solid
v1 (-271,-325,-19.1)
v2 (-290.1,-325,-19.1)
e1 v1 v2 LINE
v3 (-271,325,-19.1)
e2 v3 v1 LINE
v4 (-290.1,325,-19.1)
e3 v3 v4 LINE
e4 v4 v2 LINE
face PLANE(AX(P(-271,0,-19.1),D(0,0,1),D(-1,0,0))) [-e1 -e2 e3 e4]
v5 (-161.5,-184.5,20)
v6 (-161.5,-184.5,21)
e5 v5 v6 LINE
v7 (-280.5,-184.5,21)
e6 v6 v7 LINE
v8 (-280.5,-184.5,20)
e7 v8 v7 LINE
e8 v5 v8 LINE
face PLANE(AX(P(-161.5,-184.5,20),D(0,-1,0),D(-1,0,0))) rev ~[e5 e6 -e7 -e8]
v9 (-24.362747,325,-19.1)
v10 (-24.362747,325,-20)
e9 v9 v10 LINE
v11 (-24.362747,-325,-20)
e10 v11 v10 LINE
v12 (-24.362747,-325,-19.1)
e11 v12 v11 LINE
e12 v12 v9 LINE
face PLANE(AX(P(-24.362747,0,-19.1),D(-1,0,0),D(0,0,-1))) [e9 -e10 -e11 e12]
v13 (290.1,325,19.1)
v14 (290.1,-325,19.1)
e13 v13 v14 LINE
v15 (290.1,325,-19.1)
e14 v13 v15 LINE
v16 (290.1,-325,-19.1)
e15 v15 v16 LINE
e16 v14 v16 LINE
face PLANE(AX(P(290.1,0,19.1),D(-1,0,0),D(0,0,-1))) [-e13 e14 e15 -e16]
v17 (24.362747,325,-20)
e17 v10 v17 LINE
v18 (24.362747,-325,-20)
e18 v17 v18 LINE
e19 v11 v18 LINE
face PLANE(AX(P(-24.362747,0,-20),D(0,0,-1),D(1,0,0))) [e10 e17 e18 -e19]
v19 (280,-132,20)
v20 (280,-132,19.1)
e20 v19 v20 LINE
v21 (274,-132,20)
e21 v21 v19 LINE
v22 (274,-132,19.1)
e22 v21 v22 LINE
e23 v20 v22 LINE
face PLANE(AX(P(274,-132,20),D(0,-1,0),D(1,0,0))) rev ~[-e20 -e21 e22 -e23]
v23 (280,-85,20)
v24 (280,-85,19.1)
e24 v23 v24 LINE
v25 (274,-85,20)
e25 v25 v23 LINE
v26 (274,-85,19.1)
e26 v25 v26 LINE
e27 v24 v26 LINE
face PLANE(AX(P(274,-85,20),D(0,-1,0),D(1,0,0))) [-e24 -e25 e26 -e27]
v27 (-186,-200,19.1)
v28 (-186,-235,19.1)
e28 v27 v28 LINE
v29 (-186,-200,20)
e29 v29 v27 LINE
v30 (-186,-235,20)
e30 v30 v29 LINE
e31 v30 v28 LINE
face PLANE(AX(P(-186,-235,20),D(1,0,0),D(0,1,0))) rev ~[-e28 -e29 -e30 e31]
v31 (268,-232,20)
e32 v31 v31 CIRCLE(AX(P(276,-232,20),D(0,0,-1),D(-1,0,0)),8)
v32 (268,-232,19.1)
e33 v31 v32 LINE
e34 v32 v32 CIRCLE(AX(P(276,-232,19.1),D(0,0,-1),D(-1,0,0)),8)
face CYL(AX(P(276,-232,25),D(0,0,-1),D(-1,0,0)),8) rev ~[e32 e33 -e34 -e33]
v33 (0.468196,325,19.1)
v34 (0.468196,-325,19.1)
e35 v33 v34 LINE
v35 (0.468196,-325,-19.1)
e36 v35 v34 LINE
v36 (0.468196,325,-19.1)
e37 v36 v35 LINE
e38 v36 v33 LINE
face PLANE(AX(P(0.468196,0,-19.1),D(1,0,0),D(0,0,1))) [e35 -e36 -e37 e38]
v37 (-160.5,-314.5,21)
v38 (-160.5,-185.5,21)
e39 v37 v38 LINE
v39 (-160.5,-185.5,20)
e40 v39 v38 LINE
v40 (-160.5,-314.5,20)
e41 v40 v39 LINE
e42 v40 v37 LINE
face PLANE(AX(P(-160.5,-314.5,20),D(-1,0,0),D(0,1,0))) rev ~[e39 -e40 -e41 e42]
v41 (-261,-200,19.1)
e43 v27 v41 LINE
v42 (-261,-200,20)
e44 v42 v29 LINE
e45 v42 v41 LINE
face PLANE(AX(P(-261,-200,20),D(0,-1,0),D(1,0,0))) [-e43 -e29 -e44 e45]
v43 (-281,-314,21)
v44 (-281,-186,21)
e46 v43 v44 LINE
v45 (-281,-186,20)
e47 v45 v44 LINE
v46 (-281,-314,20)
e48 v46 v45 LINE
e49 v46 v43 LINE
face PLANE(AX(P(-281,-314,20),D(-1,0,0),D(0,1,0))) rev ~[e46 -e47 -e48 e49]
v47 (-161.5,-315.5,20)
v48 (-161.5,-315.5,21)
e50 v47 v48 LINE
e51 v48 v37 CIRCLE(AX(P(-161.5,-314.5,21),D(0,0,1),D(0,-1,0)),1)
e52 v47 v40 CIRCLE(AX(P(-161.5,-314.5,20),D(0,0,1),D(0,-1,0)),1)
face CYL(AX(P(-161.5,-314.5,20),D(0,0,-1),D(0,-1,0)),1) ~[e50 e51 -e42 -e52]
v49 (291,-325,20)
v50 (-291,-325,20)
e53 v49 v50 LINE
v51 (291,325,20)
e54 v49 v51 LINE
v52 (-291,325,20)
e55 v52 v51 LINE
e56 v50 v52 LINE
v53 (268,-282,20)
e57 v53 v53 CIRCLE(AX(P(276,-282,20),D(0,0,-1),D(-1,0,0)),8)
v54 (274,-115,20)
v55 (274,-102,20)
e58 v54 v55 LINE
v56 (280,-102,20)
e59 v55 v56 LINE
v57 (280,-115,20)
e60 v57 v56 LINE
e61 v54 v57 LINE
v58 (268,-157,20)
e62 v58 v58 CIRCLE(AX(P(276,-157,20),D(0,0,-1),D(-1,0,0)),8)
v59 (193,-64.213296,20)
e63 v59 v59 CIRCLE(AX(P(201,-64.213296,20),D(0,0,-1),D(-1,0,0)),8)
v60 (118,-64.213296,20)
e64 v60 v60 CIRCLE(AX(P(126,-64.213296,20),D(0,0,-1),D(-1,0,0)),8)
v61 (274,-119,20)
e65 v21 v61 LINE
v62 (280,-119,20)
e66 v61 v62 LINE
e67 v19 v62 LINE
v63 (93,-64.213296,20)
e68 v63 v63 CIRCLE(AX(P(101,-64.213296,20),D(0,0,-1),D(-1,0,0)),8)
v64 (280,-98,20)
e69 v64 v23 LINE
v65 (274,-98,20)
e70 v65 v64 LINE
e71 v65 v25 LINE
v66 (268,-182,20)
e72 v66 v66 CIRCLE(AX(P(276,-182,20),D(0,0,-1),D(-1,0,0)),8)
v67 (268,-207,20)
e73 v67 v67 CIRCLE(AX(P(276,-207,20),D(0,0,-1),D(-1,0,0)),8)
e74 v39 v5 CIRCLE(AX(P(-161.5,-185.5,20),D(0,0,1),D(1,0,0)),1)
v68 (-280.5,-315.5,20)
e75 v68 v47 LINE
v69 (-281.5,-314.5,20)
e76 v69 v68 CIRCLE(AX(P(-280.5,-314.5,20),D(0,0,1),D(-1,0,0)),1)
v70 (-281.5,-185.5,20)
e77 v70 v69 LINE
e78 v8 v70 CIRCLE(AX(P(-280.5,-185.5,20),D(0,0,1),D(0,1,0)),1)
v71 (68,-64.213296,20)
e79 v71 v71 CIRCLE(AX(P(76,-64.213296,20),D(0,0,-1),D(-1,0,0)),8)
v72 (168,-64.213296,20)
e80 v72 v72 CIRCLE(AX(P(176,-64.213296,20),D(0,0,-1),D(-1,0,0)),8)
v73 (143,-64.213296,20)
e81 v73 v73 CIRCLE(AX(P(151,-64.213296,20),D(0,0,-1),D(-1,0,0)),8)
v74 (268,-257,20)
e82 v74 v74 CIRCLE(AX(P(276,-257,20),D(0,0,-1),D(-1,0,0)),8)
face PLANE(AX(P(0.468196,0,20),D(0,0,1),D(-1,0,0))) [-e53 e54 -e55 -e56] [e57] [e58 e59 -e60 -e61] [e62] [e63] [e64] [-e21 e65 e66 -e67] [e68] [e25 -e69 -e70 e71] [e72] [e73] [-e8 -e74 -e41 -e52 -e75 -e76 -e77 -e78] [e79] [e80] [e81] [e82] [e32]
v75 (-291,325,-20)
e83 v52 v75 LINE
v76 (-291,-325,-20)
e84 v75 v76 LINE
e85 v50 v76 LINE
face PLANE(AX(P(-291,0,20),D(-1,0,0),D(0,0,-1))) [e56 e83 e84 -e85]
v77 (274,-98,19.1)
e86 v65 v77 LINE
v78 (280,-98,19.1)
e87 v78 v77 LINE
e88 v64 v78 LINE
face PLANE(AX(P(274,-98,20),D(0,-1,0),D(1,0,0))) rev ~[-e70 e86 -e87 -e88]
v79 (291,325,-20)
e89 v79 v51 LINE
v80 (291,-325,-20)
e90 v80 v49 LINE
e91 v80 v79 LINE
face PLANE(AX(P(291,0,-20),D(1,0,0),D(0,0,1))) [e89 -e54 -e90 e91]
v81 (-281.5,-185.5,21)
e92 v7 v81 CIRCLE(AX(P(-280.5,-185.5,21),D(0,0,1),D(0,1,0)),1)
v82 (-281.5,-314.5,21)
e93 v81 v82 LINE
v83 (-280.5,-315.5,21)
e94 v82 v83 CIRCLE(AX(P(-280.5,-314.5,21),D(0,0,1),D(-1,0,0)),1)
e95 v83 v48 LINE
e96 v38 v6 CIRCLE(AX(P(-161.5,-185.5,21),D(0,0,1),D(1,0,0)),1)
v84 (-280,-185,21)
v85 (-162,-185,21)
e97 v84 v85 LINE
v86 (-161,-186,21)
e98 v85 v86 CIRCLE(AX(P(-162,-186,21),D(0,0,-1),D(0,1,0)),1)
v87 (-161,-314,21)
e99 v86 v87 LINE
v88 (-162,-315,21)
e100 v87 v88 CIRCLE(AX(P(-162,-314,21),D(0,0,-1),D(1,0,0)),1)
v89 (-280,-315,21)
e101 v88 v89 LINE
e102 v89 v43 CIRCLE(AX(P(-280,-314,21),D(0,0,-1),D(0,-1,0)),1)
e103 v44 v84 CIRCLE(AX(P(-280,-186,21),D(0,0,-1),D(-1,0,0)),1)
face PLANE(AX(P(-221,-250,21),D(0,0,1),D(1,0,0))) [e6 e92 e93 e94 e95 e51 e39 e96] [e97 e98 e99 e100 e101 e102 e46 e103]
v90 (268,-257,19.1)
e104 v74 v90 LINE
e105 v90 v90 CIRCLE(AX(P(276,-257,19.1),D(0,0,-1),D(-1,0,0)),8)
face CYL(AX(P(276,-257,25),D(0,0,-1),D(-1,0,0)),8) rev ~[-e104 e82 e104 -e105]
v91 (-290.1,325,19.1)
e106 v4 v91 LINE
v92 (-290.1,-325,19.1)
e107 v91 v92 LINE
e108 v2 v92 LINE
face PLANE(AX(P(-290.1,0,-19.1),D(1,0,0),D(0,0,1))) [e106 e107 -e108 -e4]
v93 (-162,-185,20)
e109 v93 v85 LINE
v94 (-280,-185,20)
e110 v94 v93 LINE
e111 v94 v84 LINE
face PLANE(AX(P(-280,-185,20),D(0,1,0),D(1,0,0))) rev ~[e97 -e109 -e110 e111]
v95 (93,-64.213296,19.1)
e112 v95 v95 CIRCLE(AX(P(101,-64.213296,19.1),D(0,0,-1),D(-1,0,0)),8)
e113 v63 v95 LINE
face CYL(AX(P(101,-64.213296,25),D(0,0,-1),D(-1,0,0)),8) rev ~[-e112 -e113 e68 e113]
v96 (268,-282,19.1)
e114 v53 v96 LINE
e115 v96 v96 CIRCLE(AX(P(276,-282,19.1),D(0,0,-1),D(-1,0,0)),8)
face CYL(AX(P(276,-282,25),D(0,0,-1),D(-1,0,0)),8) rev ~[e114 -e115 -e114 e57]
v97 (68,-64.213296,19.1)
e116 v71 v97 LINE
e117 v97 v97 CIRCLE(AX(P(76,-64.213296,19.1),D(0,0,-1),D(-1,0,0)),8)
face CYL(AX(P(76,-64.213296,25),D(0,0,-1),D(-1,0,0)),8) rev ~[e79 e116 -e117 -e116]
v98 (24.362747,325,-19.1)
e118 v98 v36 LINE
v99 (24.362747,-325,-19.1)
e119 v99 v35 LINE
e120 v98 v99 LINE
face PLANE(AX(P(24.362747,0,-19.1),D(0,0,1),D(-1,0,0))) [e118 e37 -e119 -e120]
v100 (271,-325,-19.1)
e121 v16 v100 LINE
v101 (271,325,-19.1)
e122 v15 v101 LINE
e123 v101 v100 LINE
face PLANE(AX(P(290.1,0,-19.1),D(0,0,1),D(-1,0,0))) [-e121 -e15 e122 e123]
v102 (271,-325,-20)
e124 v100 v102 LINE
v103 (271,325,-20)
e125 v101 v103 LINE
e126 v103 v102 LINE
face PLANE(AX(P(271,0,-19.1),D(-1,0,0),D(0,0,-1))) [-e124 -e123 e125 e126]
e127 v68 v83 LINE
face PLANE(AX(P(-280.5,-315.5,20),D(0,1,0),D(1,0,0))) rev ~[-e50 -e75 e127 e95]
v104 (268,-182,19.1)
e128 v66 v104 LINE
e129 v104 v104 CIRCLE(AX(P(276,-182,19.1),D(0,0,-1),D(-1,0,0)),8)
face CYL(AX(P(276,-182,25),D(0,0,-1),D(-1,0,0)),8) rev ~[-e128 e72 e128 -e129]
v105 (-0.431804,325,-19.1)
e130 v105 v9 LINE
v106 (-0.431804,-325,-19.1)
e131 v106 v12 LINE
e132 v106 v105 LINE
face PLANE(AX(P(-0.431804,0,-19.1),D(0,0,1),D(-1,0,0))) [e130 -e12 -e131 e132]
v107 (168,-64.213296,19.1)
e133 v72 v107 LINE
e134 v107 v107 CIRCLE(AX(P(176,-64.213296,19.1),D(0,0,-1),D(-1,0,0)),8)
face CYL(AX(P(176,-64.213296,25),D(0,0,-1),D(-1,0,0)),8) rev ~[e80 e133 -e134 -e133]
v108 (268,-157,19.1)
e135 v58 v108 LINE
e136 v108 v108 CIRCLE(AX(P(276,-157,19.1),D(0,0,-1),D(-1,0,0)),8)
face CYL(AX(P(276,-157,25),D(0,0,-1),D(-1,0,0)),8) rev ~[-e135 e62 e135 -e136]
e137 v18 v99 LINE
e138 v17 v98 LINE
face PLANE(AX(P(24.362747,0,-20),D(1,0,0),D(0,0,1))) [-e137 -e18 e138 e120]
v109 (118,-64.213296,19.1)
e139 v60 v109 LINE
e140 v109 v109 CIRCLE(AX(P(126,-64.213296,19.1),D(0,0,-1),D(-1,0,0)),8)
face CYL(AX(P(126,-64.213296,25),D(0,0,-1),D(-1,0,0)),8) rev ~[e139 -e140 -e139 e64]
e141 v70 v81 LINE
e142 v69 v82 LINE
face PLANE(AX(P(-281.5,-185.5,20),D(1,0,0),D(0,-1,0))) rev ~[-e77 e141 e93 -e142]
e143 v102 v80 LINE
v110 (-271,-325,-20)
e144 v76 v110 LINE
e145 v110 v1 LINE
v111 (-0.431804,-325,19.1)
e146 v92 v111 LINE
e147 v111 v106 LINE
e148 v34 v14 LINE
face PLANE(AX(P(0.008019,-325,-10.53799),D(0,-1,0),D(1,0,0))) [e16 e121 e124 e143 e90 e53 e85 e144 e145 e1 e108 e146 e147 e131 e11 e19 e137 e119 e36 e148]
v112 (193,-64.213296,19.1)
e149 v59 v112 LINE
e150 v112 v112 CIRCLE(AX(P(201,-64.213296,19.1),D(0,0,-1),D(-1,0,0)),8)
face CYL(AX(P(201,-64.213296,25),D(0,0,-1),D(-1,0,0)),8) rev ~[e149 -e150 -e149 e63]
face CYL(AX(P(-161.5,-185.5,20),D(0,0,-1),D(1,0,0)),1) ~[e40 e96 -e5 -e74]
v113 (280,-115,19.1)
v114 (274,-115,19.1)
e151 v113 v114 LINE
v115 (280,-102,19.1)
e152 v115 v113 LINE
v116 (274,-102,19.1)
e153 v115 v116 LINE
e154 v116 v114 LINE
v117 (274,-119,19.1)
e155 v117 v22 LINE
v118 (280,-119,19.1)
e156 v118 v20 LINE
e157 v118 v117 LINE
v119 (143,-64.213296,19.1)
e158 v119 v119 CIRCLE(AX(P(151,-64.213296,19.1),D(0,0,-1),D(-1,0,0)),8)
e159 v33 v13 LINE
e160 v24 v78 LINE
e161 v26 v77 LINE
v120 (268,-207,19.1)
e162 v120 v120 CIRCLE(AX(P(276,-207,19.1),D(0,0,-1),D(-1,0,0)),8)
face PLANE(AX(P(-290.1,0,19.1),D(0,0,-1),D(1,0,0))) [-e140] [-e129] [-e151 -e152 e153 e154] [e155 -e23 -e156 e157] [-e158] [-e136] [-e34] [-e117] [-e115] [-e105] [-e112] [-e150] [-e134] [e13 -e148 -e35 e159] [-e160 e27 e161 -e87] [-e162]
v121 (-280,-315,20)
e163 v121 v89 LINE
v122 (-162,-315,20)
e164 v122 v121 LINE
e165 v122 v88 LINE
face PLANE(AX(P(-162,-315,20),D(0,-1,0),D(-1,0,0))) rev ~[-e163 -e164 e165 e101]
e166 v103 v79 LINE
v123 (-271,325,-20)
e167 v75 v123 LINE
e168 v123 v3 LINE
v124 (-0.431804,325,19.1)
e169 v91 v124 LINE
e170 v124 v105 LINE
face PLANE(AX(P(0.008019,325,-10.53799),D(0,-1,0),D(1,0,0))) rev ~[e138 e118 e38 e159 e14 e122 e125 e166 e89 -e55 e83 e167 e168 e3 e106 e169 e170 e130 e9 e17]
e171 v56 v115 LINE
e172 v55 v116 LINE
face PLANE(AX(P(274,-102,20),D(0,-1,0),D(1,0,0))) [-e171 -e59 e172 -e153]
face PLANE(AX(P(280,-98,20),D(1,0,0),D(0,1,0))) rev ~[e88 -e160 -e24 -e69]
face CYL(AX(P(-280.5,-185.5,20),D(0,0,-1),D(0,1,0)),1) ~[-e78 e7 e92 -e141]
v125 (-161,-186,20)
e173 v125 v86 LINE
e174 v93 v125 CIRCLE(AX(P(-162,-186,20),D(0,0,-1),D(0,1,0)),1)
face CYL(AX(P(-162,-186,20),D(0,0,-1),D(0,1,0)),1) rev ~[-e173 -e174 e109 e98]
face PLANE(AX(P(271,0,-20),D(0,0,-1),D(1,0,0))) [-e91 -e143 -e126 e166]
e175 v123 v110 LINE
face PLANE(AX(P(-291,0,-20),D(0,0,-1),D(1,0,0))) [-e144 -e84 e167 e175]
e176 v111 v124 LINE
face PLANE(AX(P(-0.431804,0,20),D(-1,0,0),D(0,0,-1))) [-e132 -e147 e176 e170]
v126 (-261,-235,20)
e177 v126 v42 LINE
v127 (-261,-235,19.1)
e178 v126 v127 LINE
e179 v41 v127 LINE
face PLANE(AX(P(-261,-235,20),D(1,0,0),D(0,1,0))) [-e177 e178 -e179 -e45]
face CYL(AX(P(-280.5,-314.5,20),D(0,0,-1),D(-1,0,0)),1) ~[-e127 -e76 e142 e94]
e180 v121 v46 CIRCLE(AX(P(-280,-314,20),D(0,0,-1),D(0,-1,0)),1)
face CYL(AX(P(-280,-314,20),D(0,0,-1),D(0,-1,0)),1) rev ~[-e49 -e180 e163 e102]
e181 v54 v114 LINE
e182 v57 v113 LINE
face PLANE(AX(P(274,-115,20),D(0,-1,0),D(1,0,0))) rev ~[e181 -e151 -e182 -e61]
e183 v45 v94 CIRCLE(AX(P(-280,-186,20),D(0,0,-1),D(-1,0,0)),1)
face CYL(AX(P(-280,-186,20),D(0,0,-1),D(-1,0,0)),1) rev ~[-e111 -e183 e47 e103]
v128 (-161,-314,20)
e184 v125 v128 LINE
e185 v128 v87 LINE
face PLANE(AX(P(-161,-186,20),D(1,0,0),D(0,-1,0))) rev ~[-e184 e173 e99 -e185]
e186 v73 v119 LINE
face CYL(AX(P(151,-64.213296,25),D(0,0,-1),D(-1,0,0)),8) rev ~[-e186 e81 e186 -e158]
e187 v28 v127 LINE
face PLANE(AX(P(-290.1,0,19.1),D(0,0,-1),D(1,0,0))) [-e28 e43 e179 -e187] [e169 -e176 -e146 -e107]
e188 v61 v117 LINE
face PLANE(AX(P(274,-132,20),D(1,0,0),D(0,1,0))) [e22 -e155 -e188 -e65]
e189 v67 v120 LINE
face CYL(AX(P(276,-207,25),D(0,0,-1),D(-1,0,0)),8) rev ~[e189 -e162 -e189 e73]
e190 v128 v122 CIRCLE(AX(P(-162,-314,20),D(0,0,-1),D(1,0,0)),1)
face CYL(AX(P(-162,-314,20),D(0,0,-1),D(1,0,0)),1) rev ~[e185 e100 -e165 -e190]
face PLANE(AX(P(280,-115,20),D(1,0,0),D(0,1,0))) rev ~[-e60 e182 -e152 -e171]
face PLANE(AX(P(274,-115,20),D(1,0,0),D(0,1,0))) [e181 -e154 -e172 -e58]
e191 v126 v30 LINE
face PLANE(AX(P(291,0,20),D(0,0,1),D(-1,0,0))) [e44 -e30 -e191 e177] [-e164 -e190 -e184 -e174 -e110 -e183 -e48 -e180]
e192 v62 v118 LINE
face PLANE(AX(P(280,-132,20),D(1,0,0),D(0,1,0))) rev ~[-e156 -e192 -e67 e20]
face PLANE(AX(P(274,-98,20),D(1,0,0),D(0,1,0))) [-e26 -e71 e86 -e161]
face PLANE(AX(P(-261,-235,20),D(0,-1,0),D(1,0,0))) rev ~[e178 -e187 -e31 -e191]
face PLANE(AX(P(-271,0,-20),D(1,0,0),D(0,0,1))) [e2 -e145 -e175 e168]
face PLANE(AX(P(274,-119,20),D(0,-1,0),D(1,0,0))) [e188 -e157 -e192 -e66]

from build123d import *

# Parameters (mm, degrees)
F1_DEPTH = 325
F3_D     = 16
F3_DEPTH = 5
F3_TIP   = 4.8068849522
F2_W     = 6
F2_H     = 13
F2_W_2   = 75
F2_H_2   = 35
F4_DEPTH = 25
F6_DEPTH = 1
F8_DEPTH = 325


# Not quite as in the source:
# - a feature names something its author has since deleted; it is built from what else it names


with BuildPart() as f1:
    # F0 (on Front) → F1 (new body, symmetric)
    with BuildSketch(Plane.XZ):
        Polygon((-291, 20), (-291, -20), (-271, -20), (-271, -19.1), (-290.1, -19.1), (-290.1, 19.1), (290.1, 19.1), (290.1, -19.1), (271, -19.1), (271, -20), (291, -20), (291, 20), align=None)
    extrude(amount=F1_DEPTH, both=True)

    # F3
    with Locations(Plane.XY.offset(20)):
        with Locations((276, -282), (276, -257), (276, -232), (276, -207), (276, -182), (201, -64.213295877), (176, -64.213295877), (151, -64.213295877), (126, -64.213295877), (101, -64.213295877), (76, -64.213295877), (276, -157)):
            Hole(F3_D / 2, depth=F3_DEPTH)
            with Locations((0, 0, -(F3_DEPTH + F3_TIP / 2))):  # 118° drill point
                Cone(0, F3_D / 2, F3_TIP, mode=Mode.SUBTRACT)

    # F2 (on face) → F4 (cut)
    with BuildSketch(Plane.XY.offset(20)):
        with Locations((277, -125.5)):
            Rectangle(F2_W, F2_H)
        with Locations((-223.5, -217.5)):
            Rectangle(F2_W_2, F2_H_2)
        with Locations((277, -108.5)):
            Rectangle(F2_W, F2_H)
        with Locations((277, -91.5)):
            Rectangle(F2_W, F2_H)
    extrude(amount=-F4_DEPTH, mode=Mode.SUBTRACT)

    # F5 (on face) → F6 (join)
    with BuildSketch(Plane.XY.offset(20)):
        with BuildLine():
            Line((-161.5, -184.5), (-280.5, -184.5))
            ThreePointArc((-280.5, -184.5), (-281.2071067812, -184.7928932188), (-281.5, -185.5))
            Line((-281.5, -185.5), (-281.5, -314.5))
            ThreePointArc((-281.5, -314.5), (-281.2071067812, -315.2071067812), (-280.5, -315.5))
            Line((-280.5, -315.5), (-161.5, -315.5))
            ThreePointArc((-161.5, -315.5), (-160.7928932188, -315.2071067812), (-160.5, -314.5))
            Line((-160.5, -314.5), (-160.5, -185.5))
            ThreePointArc((-160.5, -185.5), (-160.7928932188, -184.7928932188), (-161.5, -184.5))
        make_face()
        with BuildLine():
            ThreePointArc((-281, -186), (-280.7071067812, -185.2928932188), (-280, -185))
            Line((-280, -185), (-162, -185))
            ThreePointArc((-162, -185), (-161.2928932188, -185.2928932188), (-161, -186))
            Line((-161, -186), (-161, -314))
            ThreePointArc((-161, -314), (-161.2928932188, -314.7071067812), (-162, -315))
            Line((-162, -315), (-280, -315))
            ThreePointArc((-280, -315), (-280.7071067812, -314.7071067812), (-281, -314))
            Line((-281, -314), (-281, -186))
        make_face(mode=Mode.SUBTRACT)
    extrude(amount=F6_DEPTH)

    # F7 (on Front) → F8 (join, symmetric)
    with BuildSketch(Plane.XZ):
        Polygon((-24.3627466261, -20), (24.3627466261, -20), (24.3627466261, -19.1), (0.4681956061, -19.1), (0.4681956061, 20), (-0.4318043939, 20), (-0.4318043939, -19.1), (-24.3627466261, -19.1), align=None)
    extrude(amount=F8_DEPTH, both=True)


solid = f1.part
